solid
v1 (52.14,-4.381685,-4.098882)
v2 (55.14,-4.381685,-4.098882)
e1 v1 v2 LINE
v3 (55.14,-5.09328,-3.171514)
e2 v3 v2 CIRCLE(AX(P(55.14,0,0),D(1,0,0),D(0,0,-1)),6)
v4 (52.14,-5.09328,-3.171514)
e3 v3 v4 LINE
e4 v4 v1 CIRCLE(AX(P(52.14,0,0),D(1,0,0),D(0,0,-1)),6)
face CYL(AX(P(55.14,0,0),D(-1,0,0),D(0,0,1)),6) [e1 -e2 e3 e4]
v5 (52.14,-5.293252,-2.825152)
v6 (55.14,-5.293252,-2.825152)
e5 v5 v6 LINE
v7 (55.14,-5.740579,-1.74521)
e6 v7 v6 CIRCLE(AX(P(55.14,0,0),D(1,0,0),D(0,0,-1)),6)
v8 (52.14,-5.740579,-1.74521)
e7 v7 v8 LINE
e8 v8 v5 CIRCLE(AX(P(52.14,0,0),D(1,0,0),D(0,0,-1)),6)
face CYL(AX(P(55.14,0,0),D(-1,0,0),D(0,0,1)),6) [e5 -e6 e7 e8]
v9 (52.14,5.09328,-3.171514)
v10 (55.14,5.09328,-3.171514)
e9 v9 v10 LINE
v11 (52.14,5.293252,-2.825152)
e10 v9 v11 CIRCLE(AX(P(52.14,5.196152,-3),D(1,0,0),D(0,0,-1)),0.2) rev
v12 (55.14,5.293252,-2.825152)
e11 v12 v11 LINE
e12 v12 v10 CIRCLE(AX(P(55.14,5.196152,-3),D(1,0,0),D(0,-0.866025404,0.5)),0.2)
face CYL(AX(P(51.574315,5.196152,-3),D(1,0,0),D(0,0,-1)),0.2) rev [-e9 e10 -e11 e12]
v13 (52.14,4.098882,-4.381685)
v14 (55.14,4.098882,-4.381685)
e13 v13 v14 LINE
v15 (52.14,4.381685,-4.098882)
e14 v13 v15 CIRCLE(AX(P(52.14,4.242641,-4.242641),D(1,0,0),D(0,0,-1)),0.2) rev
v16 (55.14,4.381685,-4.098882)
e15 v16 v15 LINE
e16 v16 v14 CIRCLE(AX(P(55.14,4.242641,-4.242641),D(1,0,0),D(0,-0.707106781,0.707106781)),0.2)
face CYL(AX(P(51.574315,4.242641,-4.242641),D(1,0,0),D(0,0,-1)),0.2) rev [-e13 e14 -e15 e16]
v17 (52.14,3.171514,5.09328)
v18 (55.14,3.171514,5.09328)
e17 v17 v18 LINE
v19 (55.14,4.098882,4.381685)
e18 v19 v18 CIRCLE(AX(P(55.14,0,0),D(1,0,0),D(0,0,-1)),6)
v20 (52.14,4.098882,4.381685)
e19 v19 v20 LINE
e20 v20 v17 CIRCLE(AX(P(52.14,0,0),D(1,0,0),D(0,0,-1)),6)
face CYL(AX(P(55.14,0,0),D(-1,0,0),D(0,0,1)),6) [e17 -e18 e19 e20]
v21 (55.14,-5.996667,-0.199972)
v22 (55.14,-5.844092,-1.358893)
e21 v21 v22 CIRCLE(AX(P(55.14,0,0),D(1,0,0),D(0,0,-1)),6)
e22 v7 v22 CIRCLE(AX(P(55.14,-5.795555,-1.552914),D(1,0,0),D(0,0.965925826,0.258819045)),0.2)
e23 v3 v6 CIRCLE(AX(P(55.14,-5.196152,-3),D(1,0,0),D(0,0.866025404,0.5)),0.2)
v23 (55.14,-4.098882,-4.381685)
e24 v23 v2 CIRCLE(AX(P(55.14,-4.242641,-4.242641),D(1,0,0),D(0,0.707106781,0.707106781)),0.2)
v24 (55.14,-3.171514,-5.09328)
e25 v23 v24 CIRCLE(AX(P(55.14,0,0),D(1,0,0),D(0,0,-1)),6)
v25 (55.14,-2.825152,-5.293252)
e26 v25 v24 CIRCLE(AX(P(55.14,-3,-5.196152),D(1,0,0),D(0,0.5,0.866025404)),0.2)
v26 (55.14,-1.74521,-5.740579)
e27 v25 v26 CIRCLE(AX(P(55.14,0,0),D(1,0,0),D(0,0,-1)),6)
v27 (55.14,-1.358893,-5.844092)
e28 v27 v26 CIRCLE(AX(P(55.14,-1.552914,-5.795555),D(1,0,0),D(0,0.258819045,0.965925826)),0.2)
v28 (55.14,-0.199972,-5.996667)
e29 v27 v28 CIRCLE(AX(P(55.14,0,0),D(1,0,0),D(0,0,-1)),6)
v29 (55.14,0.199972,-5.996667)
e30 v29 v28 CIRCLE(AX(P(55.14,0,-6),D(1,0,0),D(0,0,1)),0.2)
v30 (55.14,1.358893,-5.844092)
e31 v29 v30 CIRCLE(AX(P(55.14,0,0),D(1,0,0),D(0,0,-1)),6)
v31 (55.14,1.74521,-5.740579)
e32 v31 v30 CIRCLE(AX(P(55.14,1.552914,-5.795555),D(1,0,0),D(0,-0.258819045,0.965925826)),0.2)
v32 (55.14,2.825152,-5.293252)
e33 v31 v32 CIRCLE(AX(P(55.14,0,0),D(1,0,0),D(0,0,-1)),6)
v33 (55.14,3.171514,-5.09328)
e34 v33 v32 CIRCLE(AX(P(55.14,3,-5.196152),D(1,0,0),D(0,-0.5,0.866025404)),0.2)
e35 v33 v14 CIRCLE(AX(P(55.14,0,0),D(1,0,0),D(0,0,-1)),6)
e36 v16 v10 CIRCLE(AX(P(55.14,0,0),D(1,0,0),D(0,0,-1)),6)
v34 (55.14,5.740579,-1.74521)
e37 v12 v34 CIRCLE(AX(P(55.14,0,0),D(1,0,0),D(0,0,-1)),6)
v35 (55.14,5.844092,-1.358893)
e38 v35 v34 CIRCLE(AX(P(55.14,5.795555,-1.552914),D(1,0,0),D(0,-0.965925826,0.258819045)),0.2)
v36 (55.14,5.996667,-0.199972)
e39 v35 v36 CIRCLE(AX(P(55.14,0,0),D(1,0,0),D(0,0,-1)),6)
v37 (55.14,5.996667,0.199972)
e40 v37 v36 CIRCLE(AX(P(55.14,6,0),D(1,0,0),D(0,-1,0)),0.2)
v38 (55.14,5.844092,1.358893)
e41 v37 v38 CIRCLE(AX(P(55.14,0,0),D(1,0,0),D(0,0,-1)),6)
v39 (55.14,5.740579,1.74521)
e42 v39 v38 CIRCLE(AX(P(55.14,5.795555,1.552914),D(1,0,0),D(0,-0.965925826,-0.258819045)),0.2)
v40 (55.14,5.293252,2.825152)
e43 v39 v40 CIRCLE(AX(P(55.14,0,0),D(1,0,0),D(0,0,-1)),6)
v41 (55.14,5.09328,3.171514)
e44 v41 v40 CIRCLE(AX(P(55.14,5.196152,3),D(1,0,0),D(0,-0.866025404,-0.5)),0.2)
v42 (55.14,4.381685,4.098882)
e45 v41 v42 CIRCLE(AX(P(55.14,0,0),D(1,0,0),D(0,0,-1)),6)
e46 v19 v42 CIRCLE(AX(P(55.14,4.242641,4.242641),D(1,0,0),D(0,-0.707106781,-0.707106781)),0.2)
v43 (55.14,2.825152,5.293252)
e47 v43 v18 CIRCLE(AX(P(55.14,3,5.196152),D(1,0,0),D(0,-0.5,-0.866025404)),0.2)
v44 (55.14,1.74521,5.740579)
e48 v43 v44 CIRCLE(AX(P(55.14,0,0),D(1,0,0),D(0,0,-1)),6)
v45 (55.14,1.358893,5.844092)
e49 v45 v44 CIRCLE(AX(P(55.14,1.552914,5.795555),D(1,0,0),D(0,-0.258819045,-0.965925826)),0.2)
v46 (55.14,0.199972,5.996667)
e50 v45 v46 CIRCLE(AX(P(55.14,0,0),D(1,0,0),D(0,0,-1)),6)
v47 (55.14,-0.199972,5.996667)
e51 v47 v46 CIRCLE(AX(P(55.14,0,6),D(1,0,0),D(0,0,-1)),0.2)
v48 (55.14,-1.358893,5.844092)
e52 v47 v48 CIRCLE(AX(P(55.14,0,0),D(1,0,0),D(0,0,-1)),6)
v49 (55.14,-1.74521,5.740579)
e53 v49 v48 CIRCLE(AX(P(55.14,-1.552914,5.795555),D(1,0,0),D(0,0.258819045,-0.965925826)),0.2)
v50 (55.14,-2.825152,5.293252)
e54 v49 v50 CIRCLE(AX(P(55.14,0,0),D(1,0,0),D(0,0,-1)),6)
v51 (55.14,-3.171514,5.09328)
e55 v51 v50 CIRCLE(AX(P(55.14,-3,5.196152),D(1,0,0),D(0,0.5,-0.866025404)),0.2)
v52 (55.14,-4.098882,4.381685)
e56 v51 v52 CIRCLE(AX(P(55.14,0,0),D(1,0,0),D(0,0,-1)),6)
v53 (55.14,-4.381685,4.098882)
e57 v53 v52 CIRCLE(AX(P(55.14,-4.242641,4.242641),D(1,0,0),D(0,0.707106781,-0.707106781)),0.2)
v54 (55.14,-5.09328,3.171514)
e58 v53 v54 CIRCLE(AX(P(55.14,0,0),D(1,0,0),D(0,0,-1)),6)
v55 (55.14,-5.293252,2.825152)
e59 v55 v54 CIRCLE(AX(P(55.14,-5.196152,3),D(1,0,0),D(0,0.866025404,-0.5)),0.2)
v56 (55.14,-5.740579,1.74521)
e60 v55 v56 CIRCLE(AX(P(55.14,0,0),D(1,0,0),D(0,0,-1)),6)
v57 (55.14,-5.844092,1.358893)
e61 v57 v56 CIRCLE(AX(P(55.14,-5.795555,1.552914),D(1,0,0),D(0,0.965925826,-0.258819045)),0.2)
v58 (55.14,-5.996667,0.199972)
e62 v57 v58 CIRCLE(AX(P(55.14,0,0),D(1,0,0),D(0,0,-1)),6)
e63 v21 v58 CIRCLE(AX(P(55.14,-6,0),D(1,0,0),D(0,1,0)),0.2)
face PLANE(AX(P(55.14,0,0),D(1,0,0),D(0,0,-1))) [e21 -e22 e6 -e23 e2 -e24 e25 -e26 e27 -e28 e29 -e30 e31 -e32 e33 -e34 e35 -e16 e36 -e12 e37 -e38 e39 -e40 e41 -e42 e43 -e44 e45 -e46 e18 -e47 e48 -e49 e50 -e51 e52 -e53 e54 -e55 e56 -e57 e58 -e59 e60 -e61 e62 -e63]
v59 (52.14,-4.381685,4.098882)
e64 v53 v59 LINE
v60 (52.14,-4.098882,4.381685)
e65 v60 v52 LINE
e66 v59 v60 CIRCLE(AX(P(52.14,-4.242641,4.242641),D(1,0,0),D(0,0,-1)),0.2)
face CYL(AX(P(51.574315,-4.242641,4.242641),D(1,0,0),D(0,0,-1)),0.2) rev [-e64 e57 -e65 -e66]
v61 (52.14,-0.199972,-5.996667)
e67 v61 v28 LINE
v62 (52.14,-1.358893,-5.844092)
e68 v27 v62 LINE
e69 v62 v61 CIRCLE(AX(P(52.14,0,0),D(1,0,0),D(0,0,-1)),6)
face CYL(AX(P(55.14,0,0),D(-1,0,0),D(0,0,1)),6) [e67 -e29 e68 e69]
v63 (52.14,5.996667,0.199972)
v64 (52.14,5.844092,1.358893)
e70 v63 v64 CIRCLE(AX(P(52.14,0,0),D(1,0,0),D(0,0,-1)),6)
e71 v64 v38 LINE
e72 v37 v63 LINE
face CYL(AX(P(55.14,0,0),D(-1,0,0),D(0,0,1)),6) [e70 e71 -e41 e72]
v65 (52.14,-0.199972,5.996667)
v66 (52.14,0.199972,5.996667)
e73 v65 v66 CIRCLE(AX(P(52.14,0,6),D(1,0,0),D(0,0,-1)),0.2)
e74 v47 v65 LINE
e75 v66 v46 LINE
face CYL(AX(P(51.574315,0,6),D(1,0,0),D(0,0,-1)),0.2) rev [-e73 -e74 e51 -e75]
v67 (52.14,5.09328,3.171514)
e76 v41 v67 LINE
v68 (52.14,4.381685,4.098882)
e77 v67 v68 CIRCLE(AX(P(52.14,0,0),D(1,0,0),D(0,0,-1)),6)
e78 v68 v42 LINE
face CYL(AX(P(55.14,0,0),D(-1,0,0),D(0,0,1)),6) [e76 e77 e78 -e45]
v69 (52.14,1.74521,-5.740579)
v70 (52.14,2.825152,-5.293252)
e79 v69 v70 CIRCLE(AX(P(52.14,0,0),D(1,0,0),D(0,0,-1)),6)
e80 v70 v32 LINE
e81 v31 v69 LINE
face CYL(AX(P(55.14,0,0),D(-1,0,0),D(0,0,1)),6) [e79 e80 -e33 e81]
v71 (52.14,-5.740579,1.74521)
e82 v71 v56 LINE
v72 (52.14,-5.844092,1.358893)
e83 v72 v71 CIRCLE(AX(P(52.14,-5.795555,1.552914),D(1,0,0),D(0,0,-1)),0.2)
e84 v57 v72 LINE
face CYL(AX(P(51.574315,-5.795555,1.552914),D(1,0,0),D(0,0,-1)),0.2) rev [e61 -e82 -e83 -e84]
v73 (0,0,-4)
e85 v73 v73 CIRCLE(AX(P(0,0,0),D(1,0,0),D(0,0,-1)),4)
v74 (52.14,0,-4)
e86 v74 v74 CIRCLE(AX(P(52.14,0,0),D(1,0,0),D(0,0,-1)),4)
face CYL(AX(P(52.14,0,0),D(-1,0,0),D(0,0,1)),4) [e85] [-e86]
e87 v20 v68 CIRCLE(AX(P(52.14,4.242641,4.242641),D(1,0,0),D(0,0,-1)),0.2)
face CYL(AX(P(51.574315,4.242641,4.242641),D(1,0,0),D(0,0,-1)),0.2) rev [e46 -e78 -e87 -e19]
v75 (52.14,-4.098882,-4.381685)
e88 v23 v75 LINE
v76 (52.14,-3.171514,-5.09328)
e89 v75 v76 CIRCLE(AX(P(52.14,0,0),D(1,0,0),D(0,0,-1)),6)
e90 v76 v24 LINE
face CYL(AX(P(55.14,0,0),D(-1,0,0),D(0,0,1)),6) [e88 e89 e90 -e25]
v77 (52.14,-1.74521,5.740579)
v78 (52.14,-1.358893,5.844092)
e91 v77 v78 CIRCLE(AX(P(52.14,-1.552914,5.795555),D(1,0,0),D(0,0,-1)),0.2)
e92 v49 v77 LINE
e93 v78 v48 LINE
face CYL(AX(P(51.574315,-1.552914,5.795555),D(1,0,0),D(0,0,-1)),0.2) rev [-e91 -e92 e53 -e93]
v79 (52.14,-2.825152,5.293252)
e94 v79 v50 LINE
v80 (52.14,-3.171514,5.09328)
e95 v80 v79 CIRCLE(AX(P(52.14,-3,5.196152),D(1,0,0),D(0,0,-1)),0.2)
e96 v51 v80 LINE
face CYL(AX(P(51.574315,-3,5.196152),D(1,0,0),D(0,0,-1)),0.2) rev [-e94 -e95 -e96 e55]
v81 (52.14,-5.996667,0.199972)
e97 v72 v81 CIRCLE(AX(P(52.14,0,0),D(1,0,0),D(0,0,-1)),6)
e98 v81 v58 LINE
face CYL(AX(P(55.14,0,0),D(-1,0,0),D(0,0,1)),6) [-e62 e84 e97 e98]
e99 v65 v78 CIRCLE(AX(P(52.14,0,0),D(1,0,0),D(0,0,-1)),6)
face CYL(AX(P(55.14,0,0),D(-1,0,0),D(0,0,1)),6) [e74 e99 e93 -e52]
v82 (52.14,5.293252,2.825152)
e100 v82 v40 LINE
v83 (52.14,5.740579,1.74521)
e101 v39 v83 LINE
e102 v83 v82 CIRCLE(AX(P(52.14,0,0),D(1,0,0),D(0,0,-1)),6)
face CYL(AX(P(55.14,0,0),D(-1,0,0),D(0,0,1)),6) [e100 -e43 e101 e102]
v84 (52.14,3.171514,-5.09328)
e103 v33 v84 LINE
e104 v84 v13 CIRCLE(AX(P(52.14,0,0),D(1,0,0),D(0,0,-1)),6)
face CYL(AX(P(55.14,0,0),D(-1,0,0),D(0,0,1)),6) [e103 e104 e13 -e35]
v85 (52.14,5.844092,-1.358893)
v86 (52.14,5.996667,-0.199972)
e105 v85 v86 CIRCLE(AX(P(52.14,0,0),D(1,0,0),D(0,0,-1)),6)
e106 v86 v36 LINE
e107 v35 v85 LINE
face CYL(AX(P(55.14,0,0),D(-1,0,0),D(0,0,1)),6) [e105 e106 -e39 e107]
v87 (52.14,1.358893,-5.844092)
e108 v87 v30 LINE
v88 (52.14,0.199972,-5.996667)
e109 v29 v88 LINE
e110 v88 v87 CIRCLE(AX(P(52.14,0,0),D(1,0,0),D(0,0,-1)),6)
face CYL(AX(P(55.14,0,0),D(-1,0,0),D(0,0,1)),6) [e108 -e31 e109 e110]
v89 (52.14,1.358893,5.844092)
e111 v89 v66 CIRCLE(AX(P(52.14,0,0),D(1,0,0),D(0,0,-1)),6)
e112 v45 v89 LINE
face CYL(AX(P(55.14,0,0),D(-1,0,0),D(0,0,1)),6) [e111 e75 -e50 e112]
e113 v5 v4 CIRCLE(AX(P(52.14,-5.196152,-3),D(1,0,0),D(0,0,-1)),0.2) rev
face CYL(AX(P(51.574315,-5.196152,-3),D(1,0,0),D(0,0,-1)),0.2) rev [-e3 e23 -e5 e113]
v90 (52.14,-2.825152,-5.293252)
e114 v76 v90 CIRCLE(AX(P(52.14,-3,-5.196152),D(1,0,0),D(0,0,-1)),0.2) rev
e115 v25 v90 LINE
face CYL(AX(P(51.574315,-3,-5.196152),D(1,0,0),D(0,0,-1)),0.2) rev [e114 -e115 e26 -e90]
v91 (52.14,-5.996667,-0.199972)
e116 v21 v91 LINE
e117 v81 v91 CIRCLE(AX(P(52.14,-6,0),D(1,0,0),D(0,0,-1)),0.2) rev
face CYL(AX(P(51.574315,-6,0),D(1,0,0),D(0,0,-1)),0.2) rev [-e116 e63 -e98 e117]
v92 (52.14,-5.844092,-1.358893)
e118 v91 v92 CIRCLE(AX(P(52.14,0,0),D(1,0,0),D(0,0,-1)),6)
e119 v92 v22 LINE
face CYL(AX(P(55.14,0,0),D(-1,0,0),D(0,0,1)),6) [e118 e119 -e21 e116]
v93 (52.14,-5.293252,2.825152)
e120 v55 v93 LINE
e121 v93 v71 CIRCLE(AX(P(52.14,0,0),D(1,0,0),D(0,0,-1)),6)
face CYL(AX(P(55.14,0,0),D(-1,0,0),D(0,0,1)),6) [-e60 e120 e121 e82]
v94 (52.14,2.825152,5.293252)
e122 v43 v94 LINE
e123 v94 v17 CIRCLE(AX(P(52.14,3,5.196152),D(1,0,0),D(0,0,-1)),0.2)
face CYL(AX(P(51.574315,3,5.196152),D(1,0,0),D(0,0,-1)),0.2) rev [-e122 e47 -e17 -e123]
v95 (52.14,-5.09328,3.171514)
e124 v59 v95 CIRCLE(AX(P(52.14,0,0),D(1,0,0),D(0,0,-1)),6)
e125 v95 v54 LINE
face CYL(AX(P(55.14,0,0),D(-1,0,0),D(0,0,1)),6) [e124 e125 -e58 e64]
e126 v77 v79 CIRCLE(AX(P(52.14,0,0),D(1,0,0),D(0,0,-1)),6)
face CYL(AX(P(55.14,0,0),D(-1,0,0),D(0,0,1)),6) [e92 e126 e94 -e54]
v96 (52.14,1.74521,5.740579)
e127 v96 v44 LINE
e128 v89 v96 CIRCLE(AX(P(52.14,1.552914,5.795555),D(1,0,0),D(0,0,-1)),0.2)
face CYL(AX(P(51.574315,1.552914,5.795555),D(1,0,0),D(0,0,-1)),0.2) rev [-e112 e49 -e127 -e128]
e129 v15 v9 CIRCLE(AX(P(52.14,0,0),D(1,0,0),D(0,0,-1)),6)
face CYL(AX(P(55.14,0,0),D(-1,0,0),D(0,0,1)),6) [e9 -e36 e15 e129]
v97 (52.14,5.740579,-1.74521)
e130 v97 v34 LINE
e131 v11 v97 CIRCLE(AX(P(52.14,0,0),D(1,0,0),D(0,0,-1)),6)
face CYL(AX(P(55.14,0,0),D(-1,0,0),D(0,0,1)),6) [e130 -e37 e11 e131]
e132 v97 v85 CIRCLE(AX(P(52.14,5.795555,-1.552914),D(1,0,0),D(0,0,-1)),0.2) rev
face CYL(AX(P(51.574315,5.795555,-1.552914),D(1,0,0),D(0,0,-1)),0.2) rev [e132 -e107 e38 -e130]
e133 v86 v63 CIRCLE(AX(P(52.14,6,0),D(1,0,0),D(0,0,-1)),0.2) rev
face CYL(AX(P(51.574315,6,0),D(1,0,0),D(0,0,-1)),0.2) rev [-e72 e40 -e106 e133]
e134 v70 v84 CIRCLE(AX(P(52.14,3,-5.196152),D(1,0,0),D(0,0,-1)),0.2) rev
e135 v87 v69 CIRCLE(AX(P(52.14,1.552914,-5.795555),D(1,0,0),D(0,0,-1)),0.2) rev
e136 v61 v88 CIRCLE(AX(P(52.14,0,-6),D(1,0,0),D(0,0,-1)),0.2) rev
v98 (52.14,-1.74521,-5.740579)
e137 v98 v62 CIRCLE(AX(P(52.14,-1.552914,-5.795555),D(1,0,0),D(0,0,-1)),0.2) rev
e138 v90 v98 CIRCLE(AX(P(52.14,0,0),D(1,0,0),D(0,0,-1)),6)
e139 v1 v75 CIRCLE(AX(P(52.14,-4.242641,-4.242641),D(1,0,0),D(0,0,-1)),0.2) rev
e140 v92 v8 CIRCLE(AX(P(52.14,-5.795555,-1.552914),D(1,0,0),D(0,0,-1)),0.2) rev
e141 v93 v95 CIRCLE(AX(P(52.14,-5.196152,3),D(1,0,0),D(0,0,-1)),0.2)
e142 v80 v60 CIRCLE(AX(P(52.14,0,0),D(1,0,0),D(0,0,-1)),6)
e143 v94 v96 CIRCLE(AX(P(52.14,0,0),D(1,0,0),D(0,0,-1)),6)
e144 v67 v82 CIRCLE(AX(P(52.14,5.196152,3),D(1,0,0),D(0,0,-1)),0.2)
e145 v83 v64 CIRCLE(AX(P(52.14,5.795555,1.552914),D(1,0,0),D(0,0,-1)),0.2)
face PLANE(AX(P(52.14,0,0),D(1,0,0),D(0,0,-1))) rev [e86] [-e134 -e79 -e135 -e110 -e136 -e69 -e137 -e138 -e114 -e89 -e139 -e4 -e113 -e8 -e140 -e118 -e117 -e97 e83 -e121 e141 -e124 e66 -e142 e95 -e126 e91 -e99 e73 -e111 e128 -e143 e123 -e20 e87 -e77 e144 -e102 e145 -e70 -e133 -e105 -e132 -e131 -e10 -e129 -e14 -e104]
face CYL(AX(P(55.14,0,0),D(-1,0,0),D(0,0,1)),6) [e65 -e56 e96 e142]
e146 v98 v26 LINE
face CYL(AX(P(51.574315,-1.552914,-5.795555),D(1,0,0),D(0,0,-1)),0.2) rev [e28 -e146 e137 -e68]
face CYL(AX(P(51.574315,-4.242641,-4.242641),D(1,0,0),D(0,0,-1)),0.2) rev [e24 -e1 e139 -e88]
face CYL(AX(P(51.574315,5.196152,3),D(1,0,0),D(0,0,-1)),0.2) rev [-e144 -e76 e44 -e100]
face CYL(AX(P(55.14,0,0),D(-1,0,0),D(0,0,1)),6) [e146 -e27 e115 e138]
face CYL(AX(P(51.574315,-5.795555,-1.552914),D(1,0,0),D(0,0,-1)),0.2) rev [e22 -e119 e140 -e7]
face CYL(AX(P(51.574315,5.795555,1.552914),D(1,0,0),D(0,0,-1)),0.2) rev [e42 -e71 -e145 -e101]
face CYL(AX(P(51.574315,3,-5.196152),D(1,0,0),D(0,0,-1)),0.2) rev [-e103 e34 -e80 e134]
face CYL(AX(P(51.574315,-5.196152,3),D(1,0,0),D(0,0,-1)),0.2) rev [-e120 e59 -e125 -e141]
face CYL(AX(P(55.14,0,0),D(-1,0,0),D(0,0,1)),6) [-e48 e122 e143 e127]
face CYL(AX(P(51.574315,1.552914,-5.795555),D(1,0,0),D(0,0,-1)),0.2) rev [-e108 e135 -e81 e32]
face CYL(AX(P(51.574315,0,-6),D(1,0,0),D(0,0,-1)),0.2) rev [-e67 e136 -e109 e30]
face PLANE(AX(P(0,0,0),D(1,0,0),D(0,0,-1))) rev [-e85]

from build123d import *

# Parameters (mm, degrees)
SKETCH1_R           = 4
BOSS_EXTRUDE1_DEPTH = 52.14
SKETCH2_R           = 6
BOSS_EXTRUDE2_DEPTH = 3
SKETCH3_R           = 0.2
CUT_EXTRUDE1_DEPTH  = 3
CIRPATTERN1_START   = 52.14
CIRPATTERN1_DEPTH   = 3


# Read off the part's stored shape, not the designer's step: CirPattern1
with BuildPart() as part:
    # Sketch1 → Boss-Extrude1 (new body)
    with BuildSketch(Plane(origin=(0, 0, 0), x_dir=(0, 0, -1), z_dir=(1, 0, 0))):
        Circle(SKETCH1_R)
    extrude(amount=BOSS_EXTRUDE1_DEPTH)

    # Sketch2 → Boss-Extrude2 (add)
    with BuildSketch(Plane(origin=(52.14, 0, 0), x_dir=(0, 0, -1), z_dir=(1, 0, 0))):
        Circle(SKETCH2_R)
    extrude(amount=BOSS_EXTRUDE2_DEPTH)

    # Sketch3 → Cut-Extrude1 (cut)
    with BuildSketch(Plane(origin=(55.14, 0, 0), x_dir=(0, 0, -1), z_dir=(1, 0, 0))):
        with Locations((-6, 0)):
            Circle(SKETCH3_R)
    extrude(amount=-CUT_EXTRUDE1_DEPTH, mode=Mode.SUBTRACT)

    # CirPattern1 outline → CirPattern1 (cut)
    with BuildSketch(Plane.YZ.offset(CIRPATTERN1_START)):
        with BuildLine():
            ThreePointArc((-1.358893208, 5.844091824), (-1.552914271, 5.795554958), (-1.745209873, 5.740578586))
            ThreePointArc((-1.745209873, 5.740578586), (-1.501150462, 5.602369792), (-1.358893208, 5.844091824))
        make_face()
        with BuildLine():
            ThreePointArc((1.358893208, 5.844091824), (1.501150462, 5.602369792), (1.745209873, 5.740578586))
            ThreePointArc((1.745209873, 5.740578586), (1.552914271, 5.795554958), (1.358893208, 5.844091824))
        make_face()
        with BuildLine():
            ThreePointArc((2.825152311, 5.293251782), (2.9, 5.022947342), (3.171514356, 5.093279561))
            ThreePointArc((3.171514356, 5.093279561), (3, 5.196152423), (2.825152311, 5.293251782))
        make_face()
        with BuildLine():
            ThreePointArc((4.098881951, 4.381685378), (4.101219331, 4.101219331), (4.381685378, 4.098881951))
            ThreePointArc((4.381685378, 4.098881951), (4.242640687, 4.242640687), (4.098881951, 4.381685378))
        make_face()
        with BuildLine():
            ThreePointArc((5.093279561, 3.171514356), (5.022947342, 2.9), (5.293251782, 2.825152311))
            ThreePointArc((5.293251782, 2.825152311), (5.196152423, 3), (5.093279561, 3.171514356))
        make_face()
        with BuildLine():
            ThreePointArc((5.740578586, 1.745209873), (5.602369792, 1.501150462), (5.844091824, 1.358893208))
            ThreePointArc((5.844091824, 1.358893208), (5.795554958, 1.552914271), (5.740578586, 1.745209873))
        make_face()
        with BuildLine():
            ThreePointArc((5.996666667, 0.19997222), (5.8, 0), (5.996666667, -0.19997222))
            ThreePointArc((5.996666667, -0.19997222), (6, 0), (5.996666667, 0.19997222))
        make_face()
        with BuildLine():
            ThreePointArc((5.844091824, -1.358893208), (5.602369792, -1.501150462), (5.740578586, -1.745209873))
            ThreePointArc((5.740578586, -1.745209873), (5.795554958, -1.552914271), (5.844091824, -1.358893208))
        make_face()
        with BuildLine():
            ThreePointArc((5.293251782, -2.825152311), (5.022947342, -2.9), (5.093279561, -3.171514356))
            ThreePointArc((5.093279561, -3.171514356), (5.196152423, -3), (5.293251782, -2.825152311))
        make_face()
        with BuildLine():
            ThreePointArc((4.381685378, -4.098881951), (4.101219331, -4.101219331), (4.098881951, -4.381685378))
            ThreePointArc((4.098881951, -4.381685378), (4.242640687, -4.242640687), (4.381685378, -4.098881951))
        make_face()
        with BuildLine():
            ThreePointArc((3.171514356, -5.093279561), (2.9, -5.022947342), (2.825152311, -5.293251782))
            ThreePointArc((2.825152311, -5.293251782), (3, -5.196152423), (3.171514356, -5.093279561))
        make_face()
        with BuildLine():
            ThreePointArc((1.745209873, -5.740578586), (1.501150462, -5.602369792), (1.358893208, -5.844091824))
            ThreePointArc((1.358893208, -5.844091824), (1.552914271, -5.795554958), (1.745209873, -5.740578586))
        make_face()
        with BuildLine():
            ThreePointArc((0.19997222, -5.996666667), (0, -5.8), (-0.19997222, -5.996666667))
            ThreePointArc((-0.19997222, -5.996666667), (0, -6), (0.19997222, -5.996666667))
        make_face()
        with BuildLine():
            ThreePointArc((-1.358893208, -5.844091824), (-1.501150462, -5.602369792), (-1.745209873, -5.740578586))
            ThreePointArc((-1.745209873, -5.740578586), (-1.552914271, -5.795554958), (-1.358893208, -5.844091824))
        make_face()
        with BuildLine():
            ThreePointArc((-2.825152311, -5.293251782), (-2.9, -5.022947342), (-3.171514356, -5.093279561))
            ThreePointArc((-3.171514356, -5.093279561), (-3, -5.196152423), (-2.825152311, -5.293251782))
        make_face()
        with BuildLine():
            ThreePointArc((-4.098881951, -4.381685378), (-4.101219331, -4.101219331), (-4.381685378, -4.098881951))
            ThreePointArc((-4.381685378, -4.098881951), (-4.242640687, -4.242640687), (-4.098881951, -4.381685378))
        make_face()
        with BuildLine():
            ThreePointArc((-5.093279561, -3.171514356), (-5.022947342, -2.9), (-5.293251782, -2.825152311))
            ThreePointArc((-5.293251782, -2.825152311), (-5.196152423, -3), (-5.093279561, -3.171514356))
        make_face()
        with BuildLine():
            ThreePointArc((-5.740578586, -1.745209873), (-5.602369792, -1.501150462), (-5.844091824, -1.358893208))
            ThreePointArc((-5.844091824, -1.358893208), (-5.795554958, -1.552914271), (-5.740578586, -1.745209873))
        make_face()
        with BuildLine():
            ThreePointArc((-5.996666667, -0.19997222), (-5.8, 0), (-5.996666667, 0.19997222))
            ThreePointArc((-5.996666667, 0.19997222), (-6, 0), (-5.996666667, -0.19997222))
        make_face()
        with BuildLine():
            ThreePointArc((-5.844091824, 1.358893208), (-5.602369792, 1.501150462), (-5.740578586, 1.745209873))
            ThreePointArc((-5.740578586, 1.745209873), (-5.795554958, 1.552914271), (-5.844091824, 1.358893208))
        make_face()
        with BuildLine():
            ThreePointArc((-5.293251782, 2.825152311), (-5.022947342, 2.9), (-5.093279561, 3.171514356))
            ThreePointArc((-5.093279561, 3.171514356), (-5.196152423, 3), (-5.293251782, 2.825152311))
        make_face()
        with BuildLine():
            ThreePointArc((-4.381685378, 4.098881951), (-4.101219331, 4.101219331), (-4.098881951, 4.381685378))
            ThreePointArc((-4.098881951, 4.381685378), (-4.242640687, 4.242640687), (-4.381685378, 4.098881951))
        make_face()
        with BuildLine():
            ThreePointArc((-3.171514356, 5.093279561), (-2.9, 5.022947342), (-2.825152311, 5.293251782))
            ThreePointArc((-2.825152311, 5.293251782), (-3, 5.196152423), (-3.171514356, 5.093279561))
        make_face()
    extrude(amount=CIRPATTERN1_DEPTH, mode=Mode.SUBTRACT)


solid = part.part
